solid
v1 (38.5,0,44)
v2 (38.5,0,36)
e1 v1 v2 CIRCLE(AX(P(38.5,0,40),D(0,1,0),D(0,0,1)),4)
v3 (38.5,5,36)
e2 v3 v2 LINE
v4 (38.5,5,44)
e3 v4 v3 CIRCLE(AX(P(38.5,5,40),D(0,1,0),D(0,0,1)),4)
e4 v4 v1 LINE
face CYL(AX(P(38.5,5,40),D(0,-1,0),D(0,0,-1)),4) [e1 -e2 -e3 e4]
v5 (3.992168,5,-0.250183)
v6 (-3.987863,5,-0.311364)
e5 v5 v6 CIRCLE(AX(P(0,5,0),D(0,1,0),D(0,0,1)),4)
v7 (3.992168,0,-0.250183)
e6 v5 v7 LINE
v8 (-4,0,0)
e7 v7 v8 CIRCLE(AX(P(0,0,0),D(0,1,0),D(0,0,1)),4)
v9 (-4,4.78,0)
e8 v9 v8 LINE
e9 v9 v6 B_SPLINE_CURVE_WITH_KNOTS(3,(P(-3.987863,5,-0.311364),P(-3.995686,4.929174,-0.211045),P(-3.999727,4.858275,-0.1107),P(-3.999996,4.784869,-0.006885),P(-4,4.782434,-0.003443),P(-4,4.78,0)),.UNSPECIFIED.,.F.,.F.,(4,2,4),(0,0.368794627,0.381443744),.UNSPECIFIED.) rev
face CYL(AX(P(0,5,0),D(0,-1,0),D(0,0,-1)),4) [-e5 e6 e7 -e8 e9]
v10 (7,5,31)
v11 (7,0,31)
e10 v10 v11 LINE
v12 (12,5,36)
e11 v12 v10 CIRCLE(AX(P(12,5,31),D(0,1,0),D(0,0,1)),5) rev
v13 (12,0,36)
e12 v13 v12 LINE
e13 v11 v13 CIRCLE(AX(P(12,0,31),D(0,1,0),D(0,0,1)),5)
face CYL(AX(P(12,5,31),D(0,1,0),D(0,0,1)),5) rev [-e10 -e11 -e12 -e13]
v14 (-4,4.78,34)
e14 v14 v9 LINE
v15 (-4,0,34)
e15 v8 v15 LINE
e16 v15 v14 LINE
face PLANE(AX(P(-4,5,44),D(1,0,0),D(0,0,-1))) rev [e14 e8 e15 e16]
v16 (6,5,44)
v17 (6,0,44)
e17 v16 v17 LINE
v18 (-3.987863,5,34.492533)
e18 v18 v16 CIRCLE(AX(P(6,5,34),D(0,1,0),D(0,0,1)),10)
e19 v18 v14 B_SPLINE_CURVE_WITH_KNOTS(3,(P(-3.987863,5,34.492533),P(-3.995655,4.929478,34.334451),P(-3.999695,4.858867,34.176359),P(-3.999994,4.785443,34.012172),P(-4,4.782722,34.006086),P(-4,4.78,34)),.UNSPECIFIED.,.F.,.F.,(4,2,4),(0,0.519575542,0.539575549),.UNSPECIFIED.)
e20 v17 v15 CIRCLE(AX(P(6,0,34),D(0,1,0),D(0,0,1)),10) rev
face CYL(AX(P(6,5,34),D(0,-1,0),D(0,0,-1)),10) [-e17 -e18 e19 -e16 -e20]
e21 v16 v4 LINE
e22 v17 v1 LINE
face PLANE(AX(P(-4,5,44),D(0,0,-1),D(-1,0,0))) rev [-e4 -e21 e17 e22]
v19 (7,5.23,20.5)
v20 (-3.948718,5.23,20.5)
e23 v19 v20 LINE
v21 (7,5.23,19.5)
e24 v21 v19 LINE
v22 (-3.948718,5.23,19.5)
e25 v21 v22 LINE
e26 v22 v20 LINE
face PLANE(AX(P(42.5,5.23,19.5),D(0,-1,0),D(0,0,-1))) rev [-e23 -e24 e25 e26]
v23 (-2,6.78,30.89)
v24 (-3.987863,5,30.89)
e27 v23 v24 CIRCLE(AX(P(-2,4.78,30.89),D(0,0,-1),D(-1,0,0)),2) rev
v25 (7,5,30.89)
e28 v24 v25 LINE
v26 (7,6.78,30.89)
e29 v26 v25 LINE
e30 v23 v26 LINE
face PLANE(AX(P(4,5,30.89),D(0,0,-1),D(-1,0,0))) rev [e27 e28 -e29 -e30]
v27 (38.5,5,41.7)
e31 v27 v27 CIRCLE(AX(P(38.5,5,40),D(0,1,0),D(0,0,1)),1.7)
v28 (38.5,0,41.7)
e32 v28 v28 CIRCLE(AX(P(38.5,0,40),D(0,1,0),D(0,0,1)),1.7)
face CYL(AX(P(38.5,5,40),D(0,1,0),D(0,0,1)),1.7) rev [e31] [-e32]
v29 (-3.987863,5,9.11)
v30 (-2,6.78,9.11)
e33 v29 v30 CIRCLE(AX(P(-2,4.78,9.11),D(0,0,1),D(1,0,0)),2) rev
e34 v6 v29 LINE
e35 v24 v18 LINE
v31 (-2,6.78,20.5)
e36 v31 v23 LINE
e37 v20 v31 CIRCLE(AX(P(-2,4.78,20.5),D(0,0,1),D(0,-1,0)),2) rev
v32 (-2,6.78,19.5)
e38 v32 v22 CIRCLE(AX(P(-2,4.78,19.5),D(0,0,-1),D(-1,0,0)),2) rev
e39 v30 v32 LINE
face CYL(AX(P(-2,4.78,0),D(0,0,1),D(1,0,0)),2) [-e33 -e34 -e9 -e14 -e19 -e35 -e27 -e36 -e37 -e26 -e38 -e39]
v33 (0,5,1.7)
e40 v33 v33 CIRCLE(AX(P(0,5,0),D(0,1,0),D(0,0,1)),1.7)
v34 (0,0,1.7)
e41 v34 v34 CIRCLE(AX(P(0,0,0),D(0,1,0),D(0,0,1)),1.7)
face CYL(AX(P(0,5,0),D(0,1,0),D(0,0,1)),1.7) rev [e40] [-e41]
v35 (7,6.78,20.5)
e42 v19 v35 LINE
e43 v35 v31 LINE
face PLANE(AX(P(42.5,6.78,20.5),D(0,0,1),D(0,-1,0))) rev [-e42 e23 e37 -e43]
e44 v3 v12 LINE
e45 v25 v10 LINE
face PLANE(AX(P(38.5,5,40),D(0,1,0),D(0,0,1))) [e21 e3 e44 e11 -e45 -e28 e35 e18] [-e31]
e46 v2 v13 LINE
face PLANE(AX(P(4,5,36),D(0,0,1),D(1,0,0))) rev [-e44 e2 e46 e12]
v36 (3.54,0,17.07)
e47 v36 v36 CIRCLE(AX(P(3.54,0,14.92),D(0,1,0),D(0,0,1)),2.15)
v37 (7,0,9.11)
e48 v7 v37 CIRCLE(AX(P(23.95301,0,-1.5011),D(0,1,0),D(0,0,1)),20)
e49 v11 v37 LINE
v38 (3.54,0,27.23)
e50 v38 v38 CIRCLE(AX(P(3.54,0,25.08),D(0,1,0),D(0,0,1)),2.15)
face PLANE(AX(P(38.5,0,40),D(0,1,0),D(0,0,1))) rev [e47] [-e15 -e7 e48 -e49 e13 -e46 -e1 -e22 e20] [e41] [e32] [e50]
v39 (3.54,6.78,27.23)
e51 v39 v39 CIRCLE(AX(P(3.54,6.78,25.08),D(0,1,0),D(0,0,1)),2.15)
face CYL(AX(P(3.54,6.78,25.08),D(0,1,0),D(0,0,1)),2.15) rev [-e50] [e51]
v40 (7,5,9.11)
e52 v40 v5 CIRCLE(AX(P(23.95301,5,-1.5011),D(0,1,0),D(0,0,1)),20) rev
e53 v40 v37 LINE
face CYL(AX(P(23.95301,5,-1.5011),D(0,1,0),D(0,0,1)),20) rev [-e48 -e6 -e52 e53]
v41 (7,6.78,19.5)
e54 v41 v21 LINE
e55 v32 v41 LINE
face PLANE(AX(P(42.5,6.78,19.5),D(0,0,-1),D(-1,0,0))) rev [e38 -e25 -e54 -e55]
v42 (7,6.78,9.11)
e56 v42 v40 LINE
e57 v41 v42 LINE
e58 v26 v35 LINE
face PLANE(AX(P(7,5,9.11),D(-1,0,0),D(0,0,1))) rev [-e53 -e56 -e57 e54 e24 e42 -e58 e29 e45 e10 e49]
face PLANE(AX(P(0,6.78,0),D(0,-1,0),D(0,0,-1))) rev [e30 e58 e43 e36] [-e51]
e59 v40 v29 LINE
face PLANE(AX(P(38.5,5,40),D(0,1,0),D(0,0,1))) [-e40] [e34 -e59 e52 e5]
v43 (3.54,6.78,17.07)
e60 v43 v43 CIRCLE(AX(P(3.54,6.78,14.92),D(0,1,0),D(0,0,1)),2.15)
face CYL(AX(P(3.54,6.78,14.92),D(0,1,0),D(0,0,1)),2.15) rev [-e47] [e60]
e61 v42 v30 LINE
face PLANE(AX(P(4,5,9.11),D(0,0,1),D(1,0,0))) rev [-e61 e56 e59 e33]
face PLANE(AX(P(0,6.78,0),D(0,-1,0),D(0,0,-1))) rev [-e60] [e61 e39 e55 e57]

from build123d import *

# Parameters (mm, degrees)
BOSS_EXTRU_1_DEPTH      = 5
D_GAGEMENT_M31_D        = 3.4
ESQUISSE5_W             = 11
ESQUISSE5_H             = 21.78
BOSS_EXTRU_2_DEPTH      = 1.78
ESQUISSE6_W             = 1
ESQUISSE6_H             = 1.55
ENL_V_MAT_EXTRU_1_DEPTH = 65.375604075
D_GAGEMENT_M42_D        = 4.3
ESQUISSE9_W             = 5.11
ESQUISSE9_H             = 5
BOSS_EXTRU_3_DEPTH      = 3
CONG_2_R                = 5
CONG_3_R                = 10
CONG_4_R                = 2
CONG_5_R                = 20


with BuildPart() as part:
    # Esquisse2 → Boss.-Extru.1 (new body)
    with BuildSketch(Plane(origin=(0, 0, 0), x_dir=(1, 0, 0), z_dir=(0, 1, 0))):
        with BuildLine():
            Line((4, -36), (38.5, -36))
            ThreePointArc((38.5, -36), (42.5, -40), (38.5, -44))
            Line((38.5, -44), (-4, -44))
            Line((-4, -44), (-4, 0))
            ThreePointArc((-4, 0), (0, 4), (4, 0))
            Line((4, 0), (4, -9.11))
            Line((4, -9.11), (7, -9.11))
            Line((7, -9.11), (7, -30.89))
            Line((7, -30.89), (4, -30.89))
            Line((4, -30.89), (4, -36))
        make_face()
    extrude(amount=BOSS_EXTRU_1_DEPTH)

    # Dégagement M31 (through all)
    with Locations(Plane(origin=(0, 5, 0), x_dir=(1, 0, 0), z_dir=(0, 1, 0))):
        with Locations((0, 0), (38.5, -40)):
            Hole(D_GAGEMENT_M31_D / 2)

    # Esquisse5 → Boss.-Extru.2 (add)
    with BuildSketch(Plane(origin=(0, 5, 0), x_dir=(1, 0, 0), z_dir=(0, 1, 0))):
        with Locations((1.5, -20)):
            Rectangle(ESQUISSE5_W, ESQUISSE5_H)
    extrude(amount=BOSS_EXTRU_2_DEPTH)

    # Esquisse6 → Enlèv. mat.-Extru.1 (cut, through all)
    with BuildSketch(Plane.ZY.offset(4)):
        with Locations((20, 6.005)):
            Rectangle(ESQUISSE6_W, ESQUISSE6_H)
    extrude(amount=-ENL_V_MAT_EXTRU_1_DEPTH, mode=Mode.SUBTRACT)

    # Dégagement M42 (through all)
    with Locations(Plane(origin=(0, 6.78, 0), x_dir=(1, 0, 0), z_dir=(0, 1, 0))):
        with Locations((3.54, -25.08), (3.54, -14.92)):
            Hole(D_GAGEMENT_M42_D / 2)

    # Esquisse9 → Boss.-Extru.3 (add)
    with BuildSketch(Plane(origin=(4, 0, 0), x_dir=(0, 0, -1), z_dir=(1, 0, 0))):
        with Locations((-33.445, 2.5)):
            Rectangle(ESQUISSE9_W, ESQUISSE9_H)
    extrude(amount=BOSS_EXTRU_3_DEPTH)

    # Congé2
    cong_2_edges = [part.edges().sort_by_distance(p)[0] for p in [
        (7, 2.5, 36),
    ]]
    fillet(cong_2_edges, radius=CONG_2_R)

    # Congé3
    cong_3_edges = [part.edges().sort_by_distance(p)[0] for p in [
        (-4, 2.5, 44),
    ]]
    fillet(cong_3_edges, radius=CONG_3_R)

    # Congé4
    # the kernel refuses this fillet: 2 mm, written as the material it takes off along each edge
    with BuildSketch(Plane(origin=(-4, 6.78, -2.89), x_dir=(0, -1, 0), z_dir=(0, 0, 1)), Plane(origin=(-4, 6.78, 8.5), x_dir=(0, -1, 0), z_dir=(0, 0, 1))) as cong_4_piece_1:
        with BuildLine():
            CenterArc((CONG_4_R, CONG_4_R), CONG_4_R, 180, 90)
            Line((0, CONG_4_R), (-CONG_4_R * 0.02, CONG_4_R))
            Line((-CONG_4_R * 0.02, CONG_4_R), (-CONG_4_R * 0.02, -CONG_4_R * 0.02))
            Line((-CONG_4_R * 0.02, -CONG_4_R * 0.02), (CONG_4_R, -CONG_4_R * 0.02))
            Line((CONG_4_R, -CONG_4_R * 0.02), (CONG_4_R, 0))
        make_face()
    extrude(amount=34.39, mode=Mode.SUBTRACT)

    # Congé5
    # the kernel refuses this fillet: 20 mm, written as the material it adds along each edge
    with BuildSketch(Plane(origin=(4, 0, 9.11), x_dir=(1, 0, 0), z_dir=(0, 1, 0))) as cong_5_piece_1:
        with BuildLine():
            CenterArc((19.95301022, 10.611100059), CONG_5_R, 183.585953045, 28.45700877)
            Line((-0.00783163, 9.360183343), (-2.003915815, 9.235091672))
            ThreePointArc((-2.003915815, 9.235091672), (-2, 9.11), (-2, 0))
            Line((-2, 0), (0, -2))
            ThreePointArc((0, -2), (1.5, -2), (1.304698978, -1.061110006))
            Line((1.304698978, -1.061110006), (3, 0))
        make_face()
    extrude(amount=5)


solid = part.part
